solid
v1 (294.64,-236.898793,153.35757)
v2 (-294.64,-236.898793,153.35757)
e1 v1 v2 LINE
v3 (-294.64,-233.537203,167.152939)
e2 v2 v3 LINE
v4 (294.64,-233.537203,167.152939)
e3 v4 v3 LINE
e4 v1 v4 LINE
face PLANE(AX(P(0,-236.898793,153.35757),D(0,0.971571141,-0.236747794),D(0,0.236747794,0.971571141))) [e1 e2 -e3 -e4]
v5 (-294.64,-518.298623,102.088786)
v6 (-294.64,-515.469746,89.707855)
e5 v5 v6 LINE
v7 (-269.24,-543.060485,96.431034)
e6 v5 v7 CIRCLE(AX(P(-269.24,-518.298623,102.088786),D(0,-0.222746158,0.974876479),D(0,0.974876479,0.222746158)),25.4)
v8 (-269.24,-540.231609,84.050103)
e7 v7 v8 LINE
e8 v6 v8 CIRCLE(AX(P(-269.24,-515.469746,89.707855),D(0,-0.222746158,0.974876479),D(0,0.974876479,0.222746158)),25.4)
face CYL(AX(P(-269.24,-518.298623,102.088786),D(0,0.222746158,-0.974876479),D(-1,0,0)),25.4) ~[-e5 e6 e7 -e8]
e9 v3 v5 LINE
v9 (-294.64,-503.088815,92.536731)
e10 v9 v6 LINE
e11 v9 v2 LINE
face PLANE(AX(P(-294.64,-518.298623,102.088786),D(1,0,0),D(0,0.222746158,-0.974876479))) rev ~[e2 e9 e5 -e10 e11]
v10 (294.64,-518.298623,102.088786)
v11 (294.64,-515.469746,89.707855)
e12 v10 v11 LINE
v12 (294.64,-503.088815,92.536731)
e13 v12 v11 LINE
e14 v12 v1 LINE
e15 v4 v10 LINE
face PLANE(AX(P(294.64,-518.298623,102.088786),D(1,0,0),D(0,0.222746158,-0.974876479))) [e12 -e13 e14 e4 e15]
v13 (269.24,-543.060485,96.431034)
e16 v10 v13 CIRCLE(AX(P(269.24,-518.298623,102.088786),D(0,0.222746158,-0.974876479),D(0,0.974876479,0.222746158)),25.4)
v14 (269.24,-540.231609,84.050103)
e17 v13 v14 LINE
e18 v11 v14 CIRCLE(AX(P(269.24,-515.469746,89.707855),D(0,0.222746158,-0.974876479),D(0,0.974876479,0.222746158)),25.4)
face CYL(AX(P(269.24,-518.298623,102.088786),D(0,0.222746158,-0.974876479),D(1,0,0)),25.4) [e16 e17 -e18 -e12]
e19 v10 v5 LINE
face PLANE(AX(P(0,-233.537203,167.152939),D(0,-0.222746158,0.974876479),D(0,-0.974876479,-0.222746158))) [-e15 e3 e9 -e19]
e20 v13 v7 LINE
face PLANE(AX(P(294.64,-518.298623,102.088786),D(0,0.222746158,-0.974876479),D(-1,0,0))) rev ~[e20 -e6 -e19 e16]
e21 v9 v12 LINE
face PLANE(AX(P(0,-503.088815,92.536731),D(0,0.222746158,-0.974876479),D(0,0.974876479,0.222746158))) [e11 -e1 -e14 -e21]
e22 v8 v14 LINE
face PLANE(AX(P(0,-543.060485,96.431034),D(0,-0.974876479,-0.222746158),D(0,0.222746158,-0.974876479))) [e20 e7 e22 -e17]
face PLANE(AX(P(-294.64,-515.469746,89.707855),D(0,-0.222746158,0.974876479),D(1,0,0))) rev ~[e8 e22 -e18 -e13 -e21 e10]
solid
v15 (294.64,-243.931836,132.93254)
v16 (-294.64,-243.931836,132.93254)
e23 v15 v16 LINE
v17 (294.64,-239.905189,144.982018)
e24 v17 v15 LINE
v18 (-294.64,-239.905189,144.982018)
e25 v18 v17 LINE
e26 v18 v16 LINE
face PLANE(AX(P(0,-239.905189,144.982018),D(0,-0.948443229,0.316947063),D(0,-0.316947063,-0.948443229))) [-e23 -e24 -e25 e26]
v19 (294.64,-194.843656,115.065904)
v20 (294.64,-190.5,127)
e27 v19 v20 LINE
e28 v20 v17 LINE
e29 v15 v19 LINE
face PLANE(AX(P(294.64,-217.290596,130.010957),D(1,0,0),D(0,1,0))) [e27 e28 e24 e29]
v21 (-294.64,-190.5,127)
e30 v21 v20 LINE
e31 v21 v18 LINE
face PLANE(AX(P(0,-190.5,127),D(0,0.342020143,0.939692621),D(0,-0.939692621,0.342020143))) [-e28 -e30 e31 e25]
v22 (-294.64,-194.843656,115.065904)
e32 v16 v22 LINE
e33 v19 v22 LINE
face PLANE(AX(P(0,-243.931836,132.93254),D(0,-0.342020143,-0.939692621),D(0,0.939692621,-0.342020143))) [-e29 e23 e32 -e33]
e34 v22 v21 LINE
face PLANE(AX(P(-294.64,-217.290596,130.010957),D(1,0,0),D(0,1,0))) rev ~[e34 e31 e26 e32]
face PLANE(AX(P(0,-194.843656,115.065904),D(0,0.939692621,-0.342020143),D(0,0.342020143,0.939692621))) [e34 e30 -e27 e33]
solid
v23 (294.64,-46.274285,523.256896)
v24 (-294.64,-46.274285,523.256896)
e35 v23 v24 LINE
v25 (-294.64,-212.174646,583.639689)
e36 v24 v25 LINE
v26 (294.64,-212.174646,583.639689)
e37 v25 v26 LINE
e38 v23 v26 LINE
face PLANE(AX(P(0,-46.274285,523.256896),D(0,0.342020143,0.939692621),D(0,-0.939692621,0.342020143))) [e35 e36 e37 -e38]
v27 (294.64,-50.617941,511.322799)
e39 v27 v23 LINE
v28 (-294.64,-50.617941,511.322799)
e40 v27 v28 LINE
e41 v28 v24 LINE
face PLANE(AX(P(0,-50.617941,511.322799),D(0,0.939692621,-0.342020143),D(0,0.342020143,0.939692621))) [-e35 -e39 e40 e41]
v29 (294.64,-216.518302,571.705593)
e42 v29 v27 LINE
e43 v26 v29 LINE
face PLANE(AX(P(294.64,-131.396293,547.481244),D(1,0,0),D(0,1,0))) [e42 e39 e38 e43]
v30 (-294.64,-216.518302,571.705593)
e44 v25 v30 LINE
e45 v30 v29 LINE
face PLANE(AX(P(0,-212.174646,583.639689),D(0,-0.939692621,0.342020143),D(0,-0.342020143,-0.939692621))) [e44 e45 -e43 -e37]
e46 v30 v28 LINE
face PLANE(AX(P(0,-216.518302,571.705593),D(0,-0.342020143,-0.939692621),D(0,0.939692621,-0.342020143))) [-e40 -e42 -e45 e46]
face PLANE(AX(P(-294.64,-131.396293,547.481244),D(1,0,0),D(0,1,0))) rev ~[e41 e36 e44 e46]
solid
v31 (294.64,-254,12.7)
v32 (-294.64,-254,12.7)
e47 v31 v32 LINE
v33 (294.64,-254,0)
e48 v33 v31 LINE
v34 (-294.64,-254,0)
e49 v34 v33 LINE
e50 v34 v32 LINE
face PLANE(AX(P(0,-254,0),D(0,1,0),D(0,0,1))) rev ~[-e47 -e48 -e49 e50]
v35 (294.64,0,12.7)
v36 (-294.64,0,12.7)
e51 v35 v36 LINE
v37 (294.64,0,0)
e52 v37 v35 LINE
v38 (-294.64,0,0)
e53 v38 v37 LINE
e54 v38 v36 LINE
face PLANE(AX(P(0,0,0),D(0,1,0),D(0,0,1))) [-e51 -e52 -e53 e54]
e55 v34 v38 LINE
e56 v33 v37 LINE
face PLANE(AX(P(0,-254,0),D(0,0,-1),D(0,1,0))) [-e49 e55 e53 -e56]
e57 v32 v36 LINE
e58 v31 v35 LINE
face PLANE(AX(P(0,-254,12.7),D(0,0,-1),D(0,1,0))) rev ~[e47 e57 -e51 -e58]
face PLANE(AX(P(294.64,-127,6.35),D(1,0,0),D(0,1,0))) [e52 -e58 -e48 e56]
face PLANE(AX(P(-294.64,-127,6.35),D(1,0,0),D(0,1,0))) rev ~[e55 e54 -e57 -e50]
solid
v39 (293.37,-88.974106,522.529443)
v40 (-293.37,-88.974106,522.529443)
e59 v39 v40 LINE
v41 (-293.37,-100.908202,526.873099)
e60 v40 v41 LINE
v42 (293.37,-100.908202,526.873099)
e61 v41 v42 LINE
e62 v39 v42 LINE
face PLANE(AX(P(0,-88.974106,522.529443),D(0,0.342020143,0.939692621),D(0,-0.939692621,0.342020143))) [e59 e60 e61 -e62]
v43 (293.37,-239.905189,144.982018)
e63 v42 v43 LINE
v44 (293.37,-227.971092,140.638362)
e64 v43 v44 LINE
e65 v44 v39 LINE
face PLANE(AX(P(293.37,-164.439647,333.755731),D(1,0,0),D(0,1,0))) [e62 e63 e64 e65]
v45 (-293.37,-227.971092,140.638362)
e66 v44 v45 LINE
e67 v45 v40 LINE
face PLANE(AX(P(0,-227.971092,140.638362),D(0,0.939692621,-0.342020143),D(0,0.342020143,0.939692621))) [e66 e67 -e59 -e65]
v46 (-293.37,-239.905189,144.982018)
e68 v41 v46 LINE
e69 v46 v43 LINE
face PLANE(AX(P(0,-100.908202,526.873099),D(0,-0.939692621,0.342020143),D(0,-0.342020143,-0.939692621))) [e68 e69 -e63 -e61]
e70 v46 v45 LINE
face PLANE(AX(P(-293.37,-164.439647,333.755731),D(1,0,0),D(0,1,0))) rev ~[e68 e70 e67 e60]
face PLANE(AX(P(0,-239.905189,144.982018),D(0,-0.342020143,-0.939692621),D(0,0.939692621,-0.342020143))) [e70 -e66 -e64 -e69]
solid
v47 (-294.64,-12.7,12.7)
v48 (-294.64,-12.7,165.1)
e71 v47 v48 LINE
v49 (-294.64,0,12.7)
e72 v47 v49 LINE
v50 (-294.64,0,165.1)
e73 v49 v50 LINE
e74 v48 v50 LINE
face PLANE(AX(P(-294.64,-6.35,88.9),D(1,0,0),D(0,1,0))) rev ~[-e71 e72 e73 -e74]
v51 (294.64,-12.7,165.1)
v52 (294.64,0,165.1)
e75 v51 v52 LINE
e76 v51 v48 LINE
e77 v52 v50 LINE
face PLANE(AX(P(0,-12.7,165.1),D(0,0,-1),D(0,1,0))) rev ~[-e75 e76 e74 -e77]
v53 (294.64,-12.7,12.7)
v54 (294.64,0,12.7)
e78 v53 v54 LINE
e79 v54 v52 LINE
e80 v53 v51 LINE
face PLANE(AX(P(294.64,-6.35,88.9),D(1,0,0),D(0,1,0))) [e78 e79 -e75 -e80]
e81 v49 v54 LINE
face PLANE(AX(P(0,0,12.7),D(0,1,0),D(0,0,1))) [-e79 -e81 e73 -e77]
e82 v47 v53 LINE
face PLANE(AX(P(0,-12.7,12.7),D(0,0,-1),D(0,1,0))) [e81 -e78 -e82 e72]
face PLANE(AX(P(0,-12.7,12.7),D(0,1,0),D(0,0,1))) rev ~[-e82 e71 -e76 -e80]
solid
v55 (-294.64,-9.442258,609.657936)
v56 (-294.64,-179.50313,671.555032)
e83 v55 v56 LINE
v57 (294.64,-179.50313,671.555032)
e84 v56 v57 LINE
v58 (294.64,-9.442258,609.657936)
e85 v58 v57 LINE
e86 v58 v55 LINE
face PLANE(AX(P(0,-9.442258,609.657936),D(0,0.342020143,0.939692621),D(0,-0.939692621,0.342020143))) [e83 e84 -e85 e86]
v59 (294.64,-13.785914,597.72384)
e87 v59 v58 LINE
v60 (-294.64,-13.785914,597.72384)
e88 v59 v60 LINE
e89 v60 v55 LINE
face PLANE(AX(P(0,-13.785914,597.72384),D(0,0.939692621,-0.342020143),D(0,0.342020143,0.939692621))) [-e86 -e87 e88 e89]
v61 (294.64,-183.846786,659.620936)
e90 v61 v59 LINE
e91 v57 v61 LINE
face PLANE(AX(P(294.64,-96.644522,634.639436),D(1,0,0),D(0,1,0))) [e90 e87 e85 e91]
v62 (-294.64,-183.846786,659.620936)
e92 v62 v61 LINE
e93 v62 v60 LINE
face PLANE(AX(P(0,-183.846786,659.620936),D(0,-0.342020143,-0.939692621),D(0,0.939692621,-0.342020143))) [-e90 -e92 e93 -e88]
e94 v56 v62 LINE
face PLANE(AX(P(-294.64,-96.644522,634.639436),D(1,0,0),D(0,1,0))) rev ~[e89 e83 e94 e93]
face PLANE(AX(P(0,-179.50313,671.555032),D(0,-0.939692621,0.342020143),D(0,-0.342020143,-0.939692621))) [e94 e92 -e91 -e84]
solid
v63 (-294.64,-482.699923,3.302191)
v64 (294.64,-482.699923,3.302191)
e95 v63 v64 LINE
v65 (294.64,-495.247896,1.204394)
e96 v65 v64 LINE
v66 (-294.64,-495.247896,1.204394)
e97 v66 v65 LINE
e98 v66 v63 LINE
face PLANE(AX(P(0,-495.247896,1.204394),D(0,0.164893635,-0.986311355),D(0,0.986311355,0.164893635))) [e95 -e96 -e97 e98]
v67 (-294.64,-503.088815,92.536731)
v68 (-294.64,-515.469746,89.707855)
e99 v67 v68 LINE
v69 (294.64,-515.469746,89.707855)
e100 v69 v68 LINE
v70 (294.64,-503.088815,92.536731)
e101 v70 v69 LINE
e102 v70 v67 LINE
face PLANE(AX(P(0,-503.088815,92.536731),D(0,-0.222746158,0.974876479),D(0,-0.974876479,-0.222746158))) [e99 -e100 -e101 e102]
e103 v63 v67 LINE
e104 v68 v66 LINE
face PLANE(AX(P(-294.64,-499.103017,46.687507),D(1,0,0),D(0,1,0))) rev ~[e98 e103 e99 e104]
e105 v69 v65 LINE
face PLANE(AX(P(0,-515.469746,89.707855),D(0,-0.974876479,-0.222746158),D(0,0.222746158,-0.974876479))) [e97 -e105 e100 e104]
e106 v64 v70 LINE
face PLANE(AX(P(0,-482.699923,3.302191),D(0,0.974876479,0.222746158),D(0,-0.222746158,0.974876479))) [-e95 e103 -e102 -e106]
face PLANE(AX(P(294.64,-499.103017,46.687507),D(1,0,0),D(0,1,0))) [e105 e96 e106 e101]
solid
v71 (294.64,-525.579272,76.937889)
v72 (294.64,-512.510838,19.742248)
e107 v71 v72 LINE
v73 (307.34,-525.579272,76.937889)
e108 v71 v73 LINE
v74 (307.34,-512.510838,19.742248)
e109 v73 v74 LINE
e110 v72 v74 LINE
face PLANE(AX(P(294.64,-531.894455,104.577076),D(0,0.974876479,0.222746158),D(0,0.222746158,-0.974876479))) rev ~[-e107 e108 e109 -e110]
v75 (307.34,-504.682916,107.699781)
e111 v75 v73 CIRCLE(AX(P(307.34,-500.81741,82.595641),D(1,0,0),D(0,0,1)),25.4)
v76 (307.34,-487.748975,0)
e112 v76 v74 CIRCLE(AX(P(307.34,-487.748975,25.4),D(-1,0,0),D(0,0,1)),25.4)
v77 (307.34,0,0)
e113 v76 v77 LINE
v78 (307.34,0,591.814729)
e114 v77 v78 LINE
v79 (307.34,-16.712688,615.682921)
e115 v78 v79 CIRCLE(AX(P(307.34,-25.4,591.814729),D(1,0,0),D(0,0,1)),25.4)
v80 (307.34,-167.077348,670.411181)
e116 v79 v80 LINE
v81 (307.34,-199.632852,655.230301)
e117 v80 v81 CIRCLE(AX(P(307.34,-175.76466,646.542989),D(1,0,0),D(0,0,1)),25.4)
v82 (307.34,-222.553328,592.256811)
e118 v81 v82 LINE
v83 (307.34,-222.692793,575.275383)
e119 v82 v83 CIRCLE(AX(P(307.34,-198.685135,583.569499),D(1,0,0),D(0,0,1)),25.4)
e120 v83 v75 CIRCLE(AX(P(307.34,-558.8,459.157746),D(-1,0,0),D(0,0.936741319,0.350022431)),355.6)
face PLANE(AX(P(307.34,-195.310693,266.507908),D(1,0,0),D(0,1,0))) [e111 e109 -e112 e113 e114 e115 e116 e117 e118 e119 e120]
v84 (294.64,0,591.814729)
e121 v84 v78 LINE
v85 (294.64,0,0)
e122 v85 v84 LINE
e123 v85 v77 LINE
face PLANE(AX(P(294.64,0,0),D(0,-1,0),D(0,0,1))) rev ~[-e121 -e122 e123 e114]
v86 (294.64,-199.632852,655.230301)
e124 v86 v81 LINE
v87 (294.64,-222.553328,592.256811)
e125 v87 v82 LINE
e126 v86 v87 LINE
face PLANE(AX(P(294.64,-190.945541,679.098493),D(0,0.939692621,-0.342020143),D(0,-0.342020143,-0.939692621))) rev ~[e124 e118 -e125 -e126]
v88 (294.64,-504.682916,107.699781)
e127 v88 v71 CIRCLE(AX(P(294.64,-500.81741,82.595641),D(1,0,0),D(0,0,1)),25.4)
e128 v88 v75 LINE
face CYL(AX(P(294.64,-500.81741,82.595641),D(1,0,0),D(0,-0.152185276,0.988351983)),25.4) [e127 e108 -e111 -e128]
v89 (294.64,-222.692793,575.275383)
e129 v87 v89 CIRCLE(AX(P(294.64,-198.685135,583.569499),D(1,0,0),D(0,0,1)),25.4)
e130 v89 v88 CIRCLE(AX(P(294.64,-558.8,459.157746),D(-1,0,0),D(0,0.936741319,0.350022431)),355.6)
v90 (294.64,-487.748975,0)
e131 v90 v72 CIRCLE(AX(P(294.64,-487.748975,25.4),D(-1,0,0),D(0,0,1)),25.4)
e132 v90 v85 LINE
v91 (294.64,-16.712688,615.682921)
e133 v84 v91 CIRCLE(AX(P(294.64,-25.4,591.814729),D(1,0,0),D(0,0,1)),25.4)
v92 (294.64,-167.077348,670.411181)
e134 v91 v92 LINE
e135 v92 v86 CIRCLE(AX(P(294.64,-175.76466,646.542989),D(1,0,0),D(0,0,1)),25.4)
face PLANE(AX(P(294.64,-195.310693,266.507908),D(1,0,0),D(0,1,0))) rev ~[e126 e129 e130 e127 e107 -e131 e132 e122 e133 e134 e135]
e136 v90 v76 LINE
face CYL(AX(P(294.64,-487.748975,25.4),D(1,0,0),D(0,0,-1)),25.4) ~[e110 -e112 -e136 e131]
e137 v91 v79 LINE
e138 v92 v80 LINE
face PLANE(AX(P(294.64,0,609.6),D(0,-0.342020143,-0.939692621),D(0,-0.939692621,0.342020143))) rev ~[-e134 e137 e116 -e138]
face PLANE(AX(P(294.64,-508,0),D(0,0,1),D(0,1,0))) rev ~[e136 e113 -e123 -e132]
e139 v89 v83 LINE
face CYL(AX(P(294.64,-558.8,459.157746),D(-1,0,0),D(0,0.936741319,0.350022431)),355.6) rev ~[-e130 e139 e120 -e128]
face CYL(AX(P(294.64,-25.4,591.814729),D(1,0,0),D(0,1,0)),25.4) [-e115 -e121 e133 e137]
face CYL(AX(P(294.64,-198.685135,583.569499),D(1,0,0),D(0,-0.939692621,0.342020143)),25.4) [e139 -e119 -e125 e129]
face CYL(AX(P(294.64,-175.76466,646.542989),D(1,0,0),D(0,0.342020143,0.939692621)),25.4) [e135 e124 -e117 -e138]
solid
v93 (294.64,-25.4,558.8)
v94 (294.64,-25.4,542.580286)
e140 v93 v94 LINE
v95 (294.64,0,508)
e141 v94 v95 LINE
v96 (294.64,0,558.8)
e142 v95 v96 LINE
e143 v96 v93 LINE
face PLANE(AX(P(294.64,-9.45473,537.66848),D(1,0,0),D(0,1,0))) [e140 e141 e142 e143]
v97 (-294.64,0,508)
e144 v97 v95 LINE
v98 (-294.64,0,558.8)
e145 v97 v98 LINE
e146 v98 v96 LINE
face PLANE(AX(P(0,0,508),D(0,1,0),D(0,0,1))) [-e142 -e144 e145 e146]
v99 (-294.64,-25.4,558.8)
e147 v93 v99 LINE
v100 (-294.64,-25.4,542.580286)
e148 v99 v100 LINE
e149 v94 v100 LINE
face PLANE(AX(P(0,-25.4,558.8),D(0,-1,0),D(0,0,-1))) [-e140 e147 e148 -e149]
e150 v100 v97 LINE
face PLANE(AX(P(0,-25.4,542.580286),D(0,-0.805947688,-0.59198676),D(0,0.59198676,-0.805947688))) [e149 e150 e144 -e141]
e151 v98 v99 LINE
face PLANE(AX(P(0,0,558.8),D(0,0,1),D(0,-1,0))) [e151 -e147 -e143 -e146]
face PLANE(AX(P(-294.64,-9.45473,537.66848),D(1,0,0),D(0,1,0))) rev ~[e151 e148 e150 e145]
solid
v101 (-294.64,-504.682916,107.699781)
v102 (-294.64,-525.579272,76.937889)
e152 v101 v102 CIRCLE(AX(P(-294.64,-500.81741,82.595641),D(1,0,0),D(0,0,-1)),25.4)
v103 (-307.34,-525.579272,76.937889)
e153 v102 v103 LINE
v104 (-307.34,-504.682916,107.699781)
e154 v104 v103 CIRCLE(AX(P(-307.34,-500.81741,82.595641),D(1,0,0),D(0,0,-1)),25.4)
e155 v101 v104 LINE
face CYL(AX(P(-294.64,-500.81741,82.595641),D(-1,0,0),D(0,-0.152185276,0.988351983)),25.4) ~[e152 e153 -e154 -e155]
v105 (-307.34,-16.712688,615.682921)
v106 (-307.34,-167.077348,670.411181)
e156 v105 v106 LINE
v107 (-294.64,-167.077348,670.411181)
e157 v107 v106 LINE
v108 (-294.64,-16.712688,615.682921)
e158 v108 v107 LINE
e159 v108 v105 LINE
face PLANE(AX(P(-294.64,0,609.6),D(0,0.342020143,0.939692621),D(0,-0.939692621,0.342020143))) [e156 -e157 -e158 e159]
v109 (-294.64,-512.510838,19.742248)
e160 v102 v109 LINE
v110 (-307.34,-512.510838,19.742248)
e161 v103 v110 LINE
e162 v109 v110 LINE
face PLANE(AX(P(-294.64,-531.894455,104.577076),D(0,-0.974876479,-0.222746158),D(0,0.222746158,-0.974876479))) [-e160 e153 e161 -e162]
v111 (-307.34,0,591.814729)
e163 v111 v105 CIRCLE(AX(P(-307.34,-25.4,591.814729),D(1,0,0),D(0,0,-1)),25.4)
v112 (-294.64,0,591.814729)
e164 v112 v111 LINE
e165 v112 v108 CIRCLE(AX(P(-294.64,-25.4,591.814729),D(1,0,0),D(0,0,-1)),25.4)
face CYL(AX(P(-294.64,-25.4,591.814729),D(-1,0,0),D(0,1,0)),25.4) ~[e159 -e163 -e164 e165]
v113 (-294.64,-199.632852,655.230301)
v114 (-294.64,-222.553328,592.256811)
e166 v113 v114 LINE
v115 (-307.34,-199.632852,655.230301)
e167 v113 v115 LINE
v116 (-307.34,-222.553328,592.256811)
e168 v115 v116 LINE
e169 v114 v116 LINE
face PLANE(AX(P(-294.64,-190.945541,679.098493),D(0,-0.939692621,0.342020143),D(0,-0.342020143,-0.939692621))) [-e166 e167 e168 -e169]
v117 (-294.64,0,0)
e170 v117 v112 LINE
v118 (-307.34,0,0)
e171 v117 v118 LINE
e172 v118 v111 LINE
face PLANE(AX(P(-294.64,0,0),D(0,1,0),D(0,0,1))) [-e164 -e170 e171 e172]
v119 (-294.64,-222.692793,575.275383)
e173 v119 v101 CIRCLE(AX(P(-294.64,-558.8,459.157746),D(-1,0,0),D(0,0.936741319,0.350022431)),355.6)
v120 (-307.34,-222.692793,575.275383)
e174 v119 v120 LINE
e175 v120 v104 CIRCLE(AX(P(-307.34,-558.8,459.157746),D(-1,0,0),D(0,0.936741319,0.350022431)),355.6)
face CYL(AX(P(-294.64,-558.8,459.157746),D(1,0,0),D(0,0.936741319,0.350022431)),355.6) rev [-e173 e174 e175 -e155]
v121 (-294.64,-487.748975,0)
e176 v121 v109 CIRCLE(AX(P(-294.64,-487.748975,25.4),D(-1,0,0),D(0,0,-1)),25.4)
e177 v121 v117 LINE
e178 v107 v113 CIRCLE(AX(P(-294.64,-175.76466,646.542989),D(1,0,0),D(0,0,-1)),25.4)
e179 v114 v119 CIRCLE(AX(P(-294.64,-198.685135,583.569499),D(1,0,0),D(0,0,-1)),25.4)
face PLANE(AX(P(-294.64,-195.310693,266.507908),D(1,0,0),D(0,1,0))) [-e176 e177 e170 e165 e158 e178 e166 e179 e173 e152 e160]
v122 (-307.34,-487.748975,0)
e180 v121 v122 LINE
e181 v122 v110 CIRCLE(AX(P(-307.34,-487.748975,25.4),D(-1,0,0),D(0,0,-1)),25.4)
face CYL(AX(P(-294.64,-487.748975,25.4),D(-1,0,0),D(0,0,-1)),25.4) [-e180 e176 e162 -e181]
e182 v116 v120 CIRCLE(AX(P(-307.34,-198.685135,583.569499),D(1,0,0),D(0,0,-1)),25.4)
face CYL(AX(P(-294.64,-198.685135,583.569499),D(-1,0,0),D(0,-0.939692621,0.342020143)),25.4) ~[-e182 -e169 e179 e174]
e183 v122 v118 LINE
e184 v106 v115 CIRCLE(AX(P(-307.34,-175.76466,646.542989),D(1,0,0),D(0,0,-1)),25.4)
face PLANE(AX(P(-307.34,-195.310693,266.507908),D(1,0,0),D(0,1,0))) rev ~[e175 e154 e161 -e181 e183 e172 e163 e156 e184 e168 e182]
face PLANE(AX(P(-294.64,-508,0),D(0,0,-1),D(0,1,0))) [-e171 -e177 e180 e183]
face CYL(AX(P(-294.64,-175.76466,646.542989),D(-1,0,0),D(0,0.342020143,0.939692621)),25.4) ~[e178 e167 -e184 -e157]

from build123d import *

# Parameters (mm, degrees)
F3_DEPTH  = 12.7
F6_DEPTH  = 12.7
F7_R      = 25.4
F7_2_R    = 25.4
F9_DEPTH  = 294.64
F10_DEPTH = 294.64
F11_DEPTH = 294.64
F12_DEPTH = 25.4
F13_R     = 25.4
F15_DEPTH = 294.64
F17_DEPTH = 294.64
F18_W     = 254
F18_H     = 12.7
F19_DEPTH = 294.64
F20_W     = 12.7
F20_H     = 152.4
F21_DEPTH = 294.64
F23_DEPTH = 293.37
F25_DEPTH = 294.64


with BuildPart() as f3:
    # F2 (on offset) → F3 (new body)
    with BuildSketch(Plane.YZ.offset(294.64)):
        with BuildLine():
            Line((-508, 0), (0, 0))
            Line((0, 0), (0, 609.6))
            Line((0, 609.6), (-190.9455405437, 679.0984931238))
            Line((-190.9455405437, 679.0984931238), (-225.6947871056, 583.6257228519))
            ThreePointArc((-225.6947871056, 583.6257228519), (-259.177173919, 267.6439817216), (-531.8944548557, 104.5770763332))
            Line((-531.8944548557, 104.5770763332), (-508, 0))
        make_face()
    extrude(amount=F3_DEPTH)

    # F7
    f7_edges = [f3.edges().sort_by_distance(p)[0] for p in [
        (300.99, 0, 609.6),
        (300.99, -190.945541, 679.098493),
        (300.99, -225.694787, 583.625723),
        (300.99, -531.894455, 104.577076),
        (300.99, -508, 0),
    ]]
    fillet(f7_edges, radius=F7_R)


with BuildPart() as f6:
    # F5 (on offset) → F6 (new body)
    with BuildSketch(Plane.YZ.offset(-294.64)):
        with BuildLine():
            Line((-508, 0), (0, 0))
            Line((0, 0), (0, 609.6))
            Line((0, 609.6), (-190.9455405437, 679.0984931238))
            Line((-190.9455405437, 679.0984931238), (-225.6947871056, 583.6257228519))
            ThreePointArc((-225.6947871056, 583.6257228519), (-259.177173919, 267.6439817216), (-531.8944548557, 104.5770763332))
            Line((-531.8944548557, 104.5770763332), (-508, 0))
        make_face()
    extrude(amount=-F6_DEPTH)

    # F7#2
    f7_2_edges = [f6.edges().sort_by_distance(p)[0] for p in [
        (-300.99, -225.694787, 583.625723),
        (-300.99, -190.945541, 679.098493),
        (-300.99, 0, 609.6),
        (-300.99, -531.894455, 104.577076),
        (-300.99, -508, 0),
    ]]
    fillet(f7_2_edges, radius=F7_2_R)


with BuildPart() as f9:
    # F8 (on Right) → F9 (new body, symmetric)
    with BuildSketch(Plane.YZ):
        Polygon((-518.2986226671, 102.0887864602), (-515.4697464551, 89.7078551795), (-503.0888151744, 92.5367313915), (-236.8987926395, 153.3575699491), (-233.5372032111, 167.1529393358), align=None)
    extrude(amount=F9_DEPTH, both=True)

    # F12 (add): a face of the model
    f12_faces = [f9.faces().sort_by_distance(p)[0] for p in [
        (0, -516.8841845611, 95.8983208198),
    ]]
    extrude(f12_faces, amount=F12_DEPTH)

    # F13
    f13_edges = [f9.edges().sort_by_distance(p)[0] for p in [
        (-294.64, -541.646047, 90.240568),
        (294.64, -541.646047, 90.240568),
    ]]
    fillet(f13_edges, radius=F13_R)


with BuildPart() as f10:
    # F8 (on Right) → F10 (new body, symmetric)
    with BuildSketch(Plane.YZ):
        Polygon((-515.4697464551, 89.7078551795), (-495.24789644, 1.204394213), (-482.6999233712, 3.3021911042), (-503.0888151744, 92.5367313915), align=None)
    extrude(amount=F10_DEPTH, both=True)


with BuildPart() as f11:
    # F0 (on Right) → F11 (new body, symmetric)
    with BuildSketch(Plane.YZ):
        Polygon((-25.4, 542.5802856922), (0, 508), (0, 558.8), (-25.4, 558.8), align=None)
    extrude(amount=F11_DEPTH, both=True)


with BuildPart() as f15:
    # F14 (on Right) → F15 (new body, symmetric)
    with BuildSketch(Plane.YZ):
        Polygon((-9.4422581348, 609.6579364777), (-179.5031301816, 671.5550319161), (-183.8467860018, 659.6209356321), (-13.7859139551, 597.7238401937), align=None)
    extrude(amount=F15_DEPTH, both=True)


with BuildPart() as f17:
    # F16 (on Right) → F17 (new body, symmetric)
    with BuildSketch(Plane.YZ):
        Polygon((-46.2742848321, 523.2568957286), (-212.1746461021, 583.6396890849), (-216.5183019223, 571.7055928009), (-50.6179406523, 511.3227994446), align=None)
    extrude(amount=F17_DEPTH, both=True)


with BuildPart() as f19:
    # F18 (on Right) → F19 (new body, symmetric)
    with BuildSketch(Plane.YZ):
        with Locations((-127, 6.35)):
            Rectangle(F18_W, F18_H)
    extrude(amount=F19_DEPTH, both=True)


with BuildPart() as f21:
    # F20 (on Right) → F21 (new body, symmetric)
    with BuildSketch(Plane.YZ):
        with Locations((-6.35, 88.9)):
            Rectangle(F20_W, F20_H)
    extrude(amount=F21_DEPTH, both=True)


with BuildPart() as f23:
    # F22 (on Right) → F23 (new body, symmetric)
    with BuildSketch(Plane.YZ):
        Polygon((-88.9741059927, 522.5294433083), (-100.9082022767, 526.8730991285), (-239.9051885242, 144.9820180411), (-227.9710922402, 140.6383622209), align=None)
    extrude(amount=F23_DEPTH, both=True)


with BuildPart() as f25:
    # F24 (on Right) → F25 (new body, symmetric)
    with BuildSketch(Plane.YZ):
        Polygon((-194.8436558202, 115.065903716), (-190.5, 127), (-239.9051885242, 144.9820180411), (-243.9318360877, 132.9325401877), align=None)
    extrude(amount=F25_DEPTH, both=True)


solid = Compound([f3.part, f6.part, f9.part, f10.part, f11.part, f15.part, f17.part, f19.part, f21.part, f23.part, f25.part])
